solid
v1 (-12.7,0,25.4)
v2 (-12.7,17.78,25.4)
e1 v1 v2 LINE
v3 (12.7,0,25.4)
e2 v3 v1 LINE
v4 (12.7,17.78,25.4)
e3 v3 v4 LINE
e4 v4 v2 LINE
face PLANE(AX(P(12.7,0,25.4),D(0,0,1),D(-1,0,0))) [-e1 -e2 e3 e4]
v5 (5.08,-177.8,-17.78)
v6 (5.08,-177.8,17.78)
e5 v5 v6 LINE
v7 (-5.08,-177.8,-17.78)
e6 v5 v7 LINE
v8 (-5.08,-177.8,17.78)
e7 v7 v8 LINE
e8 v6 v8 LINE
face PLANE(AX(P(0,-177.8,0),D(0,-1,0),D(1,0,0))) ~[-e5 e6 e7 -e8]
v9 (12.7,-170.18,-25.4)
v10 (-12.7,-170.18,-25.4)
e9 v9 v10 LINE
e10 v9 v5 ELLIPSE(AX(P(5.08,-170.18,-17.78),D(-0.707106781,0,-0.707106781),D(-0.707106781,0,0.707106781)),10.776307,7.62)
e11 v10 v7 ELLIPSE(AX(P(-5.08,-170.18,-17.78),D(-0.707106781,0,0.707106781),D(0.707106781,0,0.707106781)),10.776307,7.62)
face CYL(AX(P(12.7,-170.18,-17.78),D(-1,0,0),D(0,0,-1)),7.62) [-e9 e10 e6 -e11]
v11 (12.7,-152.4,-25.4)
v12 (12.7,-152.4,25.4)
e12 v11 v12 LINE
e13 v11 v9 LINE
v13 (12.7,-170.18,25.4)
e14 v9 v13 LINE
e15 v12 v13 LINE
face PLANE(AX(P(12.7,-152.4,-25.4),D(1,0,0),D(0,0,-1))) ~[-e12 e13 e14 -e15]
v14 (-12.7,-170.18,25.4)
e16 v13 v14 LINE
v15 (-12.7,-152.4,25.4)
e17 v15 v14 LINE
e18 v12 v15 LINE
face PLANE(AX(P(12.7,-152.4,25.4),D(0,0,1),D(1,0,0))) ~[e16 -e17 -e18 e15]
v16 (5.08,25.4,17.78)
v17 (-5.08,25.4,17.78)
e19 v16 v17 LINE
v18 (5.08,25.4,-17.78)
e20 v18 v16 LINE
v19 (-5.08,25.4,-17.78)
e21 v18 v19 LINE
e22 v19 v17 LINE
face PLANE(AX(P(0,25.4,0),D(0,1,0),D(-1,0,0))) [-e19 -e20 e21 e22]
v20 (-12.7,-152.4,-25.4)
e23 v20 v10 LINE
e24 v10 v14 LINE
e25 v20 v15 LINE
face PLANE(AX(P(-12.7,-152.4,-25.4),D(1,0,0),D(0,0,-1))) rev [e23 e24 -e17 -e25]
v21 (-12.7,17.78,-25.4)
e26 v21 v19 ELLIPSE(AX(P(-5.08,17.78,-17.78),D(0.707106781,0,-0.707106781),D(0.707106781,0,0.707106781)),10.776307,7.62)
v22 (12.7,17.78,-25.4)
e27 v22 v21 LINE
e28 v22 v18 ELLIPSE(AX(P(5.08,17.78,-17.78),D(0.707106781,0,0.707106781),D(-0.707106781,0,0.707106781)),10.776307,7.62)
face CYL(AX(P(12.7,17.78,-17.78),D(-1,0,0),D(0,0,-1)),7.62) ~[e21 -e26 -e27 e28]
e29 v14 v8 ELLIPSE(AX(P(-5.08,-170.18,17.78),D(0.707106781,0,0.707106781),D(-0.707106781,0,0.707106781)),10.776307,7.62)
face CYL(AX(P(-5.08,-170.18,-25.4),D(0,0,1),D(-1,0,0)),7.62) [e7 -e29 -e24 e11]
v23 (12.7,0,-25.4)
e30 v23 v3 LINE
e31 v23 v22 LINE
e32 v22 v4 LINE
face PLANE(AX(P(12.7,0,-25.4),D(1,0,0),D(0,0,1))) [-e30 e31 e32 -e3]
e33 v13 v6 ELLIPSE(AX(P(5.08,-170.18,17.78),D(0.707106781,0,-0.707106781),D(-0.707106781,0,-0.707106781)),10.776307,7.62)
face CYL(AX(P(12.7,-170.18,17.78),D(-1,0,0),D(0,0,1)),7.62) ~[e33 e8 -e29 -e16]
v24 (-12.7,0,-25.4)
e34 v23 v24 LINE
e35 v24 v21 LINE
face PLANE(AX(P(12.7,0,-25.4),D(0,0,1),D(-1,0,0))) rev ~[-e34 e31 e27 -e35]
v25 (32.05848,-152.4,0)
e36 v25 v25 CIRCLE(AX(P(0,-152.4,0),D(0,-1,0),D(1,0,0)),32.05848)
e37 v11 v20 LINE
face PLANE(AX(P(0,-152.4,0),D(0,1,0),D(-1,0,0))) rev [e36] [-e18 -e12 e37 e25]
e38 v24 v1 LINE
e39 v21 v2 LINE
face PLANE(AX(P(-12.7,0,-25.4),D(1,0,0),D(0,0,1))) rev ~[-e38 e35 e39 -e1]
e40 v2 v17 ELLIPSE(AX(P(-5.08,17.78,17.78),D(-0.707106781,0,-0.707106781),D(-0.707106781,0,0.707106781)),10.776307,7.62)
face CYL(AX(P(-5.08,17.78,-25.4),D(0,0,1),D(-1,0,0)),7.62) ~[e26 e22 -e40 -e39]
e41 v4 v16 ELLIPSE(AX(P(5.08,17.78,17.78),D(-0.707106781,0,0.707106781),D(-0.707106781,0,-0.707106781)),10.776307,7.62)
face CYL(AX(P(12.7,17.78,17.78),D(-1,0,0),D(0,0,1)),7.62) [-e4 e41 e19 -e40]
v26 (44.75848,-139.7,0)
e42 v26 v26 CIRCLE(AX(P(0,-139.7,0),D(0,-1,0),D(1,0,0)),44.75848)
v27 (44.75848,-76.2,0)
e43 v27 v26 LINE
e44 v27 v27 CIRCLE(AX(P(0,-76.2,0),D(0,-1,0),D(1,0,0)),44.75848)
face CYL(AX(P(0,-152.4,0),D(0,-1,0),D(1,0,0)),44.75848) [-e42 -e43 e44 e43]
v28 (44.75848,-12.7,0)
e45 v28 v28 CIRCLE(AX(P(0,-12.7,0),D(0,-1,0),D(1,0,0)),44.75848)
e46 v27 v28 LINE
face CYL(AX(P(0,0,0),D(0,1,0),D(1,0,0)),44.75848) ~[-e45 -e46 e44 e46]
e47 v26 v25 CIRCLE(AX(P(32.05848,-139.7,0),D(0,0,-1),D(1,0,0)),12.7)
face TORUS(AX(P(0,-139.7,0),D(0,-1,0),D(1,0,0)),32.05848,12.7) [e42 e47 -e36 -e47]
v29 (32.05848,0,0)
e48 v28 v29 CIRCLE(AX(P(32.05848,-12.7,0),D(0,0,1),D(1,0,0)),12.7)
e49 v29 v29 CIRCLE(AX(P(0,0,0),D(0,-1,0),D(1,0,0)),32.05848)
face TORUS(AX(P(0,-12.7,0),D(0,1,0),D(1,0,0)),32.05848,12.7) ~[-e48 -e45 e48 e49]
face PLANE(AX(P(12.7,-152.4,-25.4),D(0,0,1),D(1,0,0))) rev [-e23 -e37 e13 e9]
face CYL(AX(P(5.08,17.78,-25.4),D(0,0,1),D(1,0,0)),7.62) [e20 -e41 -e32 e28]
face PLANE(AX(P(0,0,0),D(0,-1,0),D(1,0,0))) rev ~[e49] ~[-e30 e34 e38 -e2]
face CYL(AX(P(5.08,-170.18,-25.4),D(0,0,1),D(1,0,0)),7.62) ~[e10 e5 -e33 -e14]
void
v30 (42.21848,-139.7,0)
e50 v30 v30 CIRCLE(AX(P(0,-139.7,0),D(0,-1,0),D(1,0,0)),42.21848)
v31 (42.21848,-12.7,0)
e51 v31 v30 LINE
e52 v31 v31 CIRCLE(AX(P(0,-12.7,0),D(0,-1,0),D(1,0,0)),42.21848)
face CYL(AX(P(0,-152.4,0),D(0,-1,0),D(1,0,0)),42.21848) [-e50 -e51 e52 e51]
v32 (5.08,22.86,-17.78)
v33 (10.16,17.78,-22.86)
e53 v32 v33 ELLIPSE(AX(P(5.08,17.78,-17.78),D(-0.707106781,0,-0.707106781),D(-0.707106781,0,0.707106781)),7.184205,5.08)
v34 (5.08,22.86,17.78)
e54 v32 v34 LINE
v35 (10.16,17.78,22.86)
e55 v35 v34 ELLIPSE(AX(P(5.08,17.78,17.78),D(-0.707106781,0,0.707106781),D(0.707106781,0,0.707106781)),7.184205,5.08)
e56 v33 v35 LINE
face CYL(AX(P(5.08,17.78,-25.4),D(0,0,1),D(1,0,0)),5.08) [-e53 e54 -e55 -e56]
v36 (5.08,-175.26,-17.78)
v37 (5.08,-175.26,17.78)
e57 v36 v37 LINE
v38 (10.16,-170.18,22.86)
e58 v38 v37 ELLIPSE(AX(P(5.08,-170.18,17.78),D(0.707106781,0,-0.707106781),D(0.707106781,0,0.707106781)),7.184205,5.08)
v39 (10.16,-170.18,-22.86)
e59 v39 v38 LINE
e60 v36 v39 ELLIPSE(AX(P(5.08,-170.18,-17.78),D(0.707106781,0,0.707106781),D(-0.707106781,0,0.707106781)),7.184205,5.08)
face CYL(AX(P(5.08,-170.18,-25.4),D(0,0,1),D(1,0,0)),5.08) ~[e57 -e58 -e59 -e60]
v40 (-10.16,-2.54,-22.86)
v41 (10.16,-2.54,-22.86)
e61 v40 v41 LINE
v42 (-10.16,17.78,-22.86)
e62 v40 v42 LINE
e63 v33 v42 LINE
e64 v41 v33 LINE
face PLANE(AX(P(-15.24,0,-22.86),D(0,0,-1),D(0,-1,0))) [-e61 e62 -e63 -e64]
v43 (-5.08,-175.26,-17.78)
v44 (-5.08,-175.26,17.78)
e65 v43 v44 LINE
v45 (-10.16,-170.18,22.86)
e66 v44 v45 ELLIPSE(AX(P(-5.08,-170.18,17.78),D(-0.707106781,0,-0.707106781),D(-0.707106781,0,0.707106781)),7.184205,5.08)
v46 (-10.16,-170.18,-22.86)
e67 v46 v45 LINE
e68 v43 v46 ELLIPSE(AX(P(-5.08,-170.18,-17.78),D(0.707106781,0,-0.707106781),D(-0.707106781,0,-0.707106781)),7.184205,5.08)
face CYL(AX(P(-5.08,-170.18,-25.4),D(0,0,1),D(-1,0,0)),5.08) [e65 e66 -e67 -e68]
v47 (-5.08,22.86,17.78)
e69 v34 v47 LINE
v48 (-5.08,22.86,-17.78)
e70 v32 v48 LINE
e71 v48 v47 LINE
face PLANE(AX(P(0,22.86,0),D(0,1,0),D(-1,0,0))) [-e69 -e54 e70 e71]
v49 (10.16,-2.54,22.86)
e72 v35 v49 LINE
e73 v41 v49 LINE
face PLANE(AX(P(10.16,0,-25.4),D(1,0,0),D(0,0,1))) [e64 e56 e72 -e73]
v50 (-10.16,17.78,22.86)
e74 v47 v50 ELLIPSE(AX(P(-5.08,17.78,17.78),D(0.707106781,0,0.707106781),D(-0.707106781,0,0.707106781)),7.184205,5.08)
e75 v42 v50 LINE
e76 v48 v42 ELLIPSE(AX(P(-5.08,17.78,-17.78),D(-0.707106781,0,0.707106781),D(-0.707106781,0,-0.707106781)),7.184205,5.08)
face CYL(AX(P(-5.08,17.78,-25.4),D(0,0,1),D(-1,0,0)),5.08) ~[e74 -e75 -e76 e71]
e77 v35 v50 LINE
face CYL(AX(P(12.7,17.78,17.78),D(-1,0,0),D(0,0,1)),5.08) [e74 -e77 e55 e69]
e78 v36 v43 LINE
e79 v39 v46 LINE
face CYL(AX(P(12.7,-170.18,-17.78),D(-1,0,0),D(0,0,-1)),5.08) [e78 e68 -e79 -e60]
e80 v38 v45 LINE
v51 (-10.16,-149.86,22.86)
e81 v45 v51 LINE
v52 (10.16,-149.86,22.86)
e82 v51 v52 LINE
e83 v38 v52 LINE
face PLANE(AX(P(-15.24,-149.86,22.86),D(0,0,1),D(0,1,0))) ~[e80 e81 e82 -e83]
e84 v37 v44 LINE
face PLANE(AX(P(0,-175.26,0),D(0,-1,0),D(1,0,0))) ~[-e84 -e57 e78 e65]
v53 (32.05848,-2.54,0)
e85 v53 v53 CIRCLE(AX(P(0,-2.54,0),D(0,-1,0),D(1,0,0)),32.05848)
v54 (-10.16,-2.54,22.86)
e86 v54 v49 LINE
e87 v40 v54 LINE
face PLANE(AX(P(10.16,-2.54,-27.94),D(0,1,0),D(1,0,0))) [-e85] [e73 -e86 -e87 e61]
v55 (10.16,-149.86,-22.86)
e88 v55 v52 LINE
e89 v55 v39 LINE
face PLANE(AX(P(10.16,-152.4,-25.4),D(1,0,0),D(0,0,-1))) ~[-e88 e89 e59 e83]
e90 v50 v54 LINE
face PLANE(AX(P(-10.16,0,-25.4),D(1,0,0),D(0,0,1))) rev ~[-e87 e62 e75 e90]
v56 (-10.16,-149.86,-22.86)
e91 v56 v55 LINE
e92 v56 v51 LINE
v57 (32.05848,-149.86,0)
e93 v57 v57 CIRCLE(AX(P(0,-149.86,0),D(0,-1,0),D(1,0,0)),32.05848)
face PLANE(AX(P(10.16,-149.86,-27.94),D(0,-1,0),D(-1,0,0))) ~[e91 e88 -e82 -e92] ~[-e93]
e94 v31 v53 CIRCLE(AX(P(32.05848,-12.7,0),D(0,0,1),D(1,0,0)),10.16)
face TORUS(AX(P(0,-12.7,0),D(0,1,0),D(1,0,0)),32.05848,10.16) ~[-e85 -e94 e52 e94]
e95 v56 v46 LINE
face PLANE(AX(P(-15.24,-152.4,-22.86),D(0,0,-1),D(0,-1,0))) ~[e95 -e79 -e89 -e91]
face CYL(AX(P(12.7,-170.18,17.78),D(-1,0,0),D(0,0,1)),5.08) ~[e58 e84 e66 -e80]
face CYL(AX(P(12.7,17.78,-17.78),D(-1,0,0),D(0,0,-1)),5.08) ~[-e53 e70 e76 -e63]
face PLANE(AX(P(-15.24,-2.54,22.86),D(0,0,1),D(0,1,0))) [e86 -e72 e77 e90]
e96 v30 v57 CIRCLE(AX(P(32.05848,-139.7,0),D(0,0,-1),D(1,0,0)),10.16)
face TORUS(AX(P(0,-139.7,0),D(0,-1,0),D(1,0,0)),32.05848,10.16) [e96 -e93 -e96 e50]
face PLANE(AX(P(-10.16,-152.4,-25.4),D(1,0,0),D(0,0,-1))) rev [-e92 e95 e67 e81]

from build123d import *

# Parameters (mm, degrees)
F0_R        = 44.7584797017
F1_DEPTH    = 76.2
F2_DEPTH    = 25.4
F4_R        = 12.7
F3_W        = 25.4
F3_H        = 50.8
F5_DEPTH    = 25.4
F6_R        = 7.62
F7_T        = 2.54
F7_T3_DEPTH = 30.48
F7_T5_DEPTH = 55.88


# Not quite as in the source:
# - a shell that OpenCascade refuses in one call is made with other operations: the cavity is built on its own and cut out


with BuildPart() as f1:
    # F0 (on Front) → F1 (new body)
    with BuildSketch(Plane.XZ):
        Circle(F0_R)
    extrude(amount=F1_DEPTH)

    # F0 (on Front) → F2 (join)
    with BuildSketch(Plane.XZ):
        Circle(F0_R)
    extrude(amount=F2_DEPTH)

    # F4
    f4_edges = [f1.edges().sort_by_distance(p)[0] for p in [
        (-44.75848, 0, 0),
    ]]
    fillet(f4_edges, radius=F4_R)

    # F3 (on face) → F5 (join)
    with BuildSketch(Plane(origin=(0, 0, 0), x_dir=(-1, 0, 0), z_dir=(0, 1, 0))):
        Rectangle(F3_W, F3_H)
    extrude(amount=F5_DEPTH)

    # F6
    f6_edges = [f1.edges().sort_by_distance(p)[0] for p in [
        (-12.7, 25.4, 0),
        (0, 25.4, 25.4),
        (12.7, 25.4, 0),
        (0, 25.4, -25.4),
    ]]
    fillet(f6_edges, radius=F6_R)

    # F7: shell of thickness 2.54, made by hand


with BuildPart() as f7_core1:
    # F7_t2: copy of F1
    add(f1.part)

    # the walls: a layer under each face that stays
    f7_faces = [f7_core1.faces().sort_by_distance(p)[0] for p in [
        (0, 8.89, -25.4),
        (12.7, 8.89, 0),
        (0, 23.1681536726, -23.1681536726),
        (-21.3723198011, 0, -21.3723198011),
        (-12.7, 8.89, 0),
        (0, 8.89, 25.4),
        (10.4681536726, 23.1681536726, 0),
        (0, 25.4, 0),
        (-10.4681536726, 23.1681536726, 0),
        (-41.0387358228, -3.7197438789, 0),
        (0, 23.1681536726, 23.1681536726),
        (-44.7584797017, -44.45, 0),
    ]]
    thicken(f7_faces, amount=-F7_T, mode=Mode.SUBTRACT)

    # F7_s4 → F7_t3 (cut)
    with BuildSketch(Plane.YZ.offset(-15.24)):
        Polygon((0.0254, -25.4254), (0, -22.86), (-2.54, -22.86), (-2.54, -25.4), align=None)
        Polygon((0.0254, 25.4254), (-2.54, 25.4), (-2.54, 22.86), (0, 22.86), align=None)
    extrude(amount=F7_T3_DEPTH, mode=Mode.SUBTRACT)

    # F7_s6 → F7_t5 (cut)
    with BuildSketch(Plane.XY.offset(-27.94)):
        Polygon((12.7254, 0.0254), (10.16, 0), (10.16, -2.54), (12.7, -2.54), align=None)
        Polygon((-12.7254, 0.0254), (-12.7, -2.54), (-10.16, -2.54), (-10.16, 0), align=None)
    extrude(amount=F7_T5_DEPTH, mode=Mode.SUBTRACT)


with BuildPart() as f1_1:
    add(f1.part)

    # what is left inside the walls is the cavity
    f7_cavity = [f7_core1.part.solids().sort_by_distance(p)[0] for p in [
        (-42.19308, -55.033333, 0),
    ]]
    add(f7_cavity, mode=Mode.SUBTRACT)

    # F8: F1 across face


with BuildPart() as f1_2:
    add(f1_1.part)
    add(f1_1.part.mirror(Plane.XZ.offset(76.2)))


solid = f1_2.part
